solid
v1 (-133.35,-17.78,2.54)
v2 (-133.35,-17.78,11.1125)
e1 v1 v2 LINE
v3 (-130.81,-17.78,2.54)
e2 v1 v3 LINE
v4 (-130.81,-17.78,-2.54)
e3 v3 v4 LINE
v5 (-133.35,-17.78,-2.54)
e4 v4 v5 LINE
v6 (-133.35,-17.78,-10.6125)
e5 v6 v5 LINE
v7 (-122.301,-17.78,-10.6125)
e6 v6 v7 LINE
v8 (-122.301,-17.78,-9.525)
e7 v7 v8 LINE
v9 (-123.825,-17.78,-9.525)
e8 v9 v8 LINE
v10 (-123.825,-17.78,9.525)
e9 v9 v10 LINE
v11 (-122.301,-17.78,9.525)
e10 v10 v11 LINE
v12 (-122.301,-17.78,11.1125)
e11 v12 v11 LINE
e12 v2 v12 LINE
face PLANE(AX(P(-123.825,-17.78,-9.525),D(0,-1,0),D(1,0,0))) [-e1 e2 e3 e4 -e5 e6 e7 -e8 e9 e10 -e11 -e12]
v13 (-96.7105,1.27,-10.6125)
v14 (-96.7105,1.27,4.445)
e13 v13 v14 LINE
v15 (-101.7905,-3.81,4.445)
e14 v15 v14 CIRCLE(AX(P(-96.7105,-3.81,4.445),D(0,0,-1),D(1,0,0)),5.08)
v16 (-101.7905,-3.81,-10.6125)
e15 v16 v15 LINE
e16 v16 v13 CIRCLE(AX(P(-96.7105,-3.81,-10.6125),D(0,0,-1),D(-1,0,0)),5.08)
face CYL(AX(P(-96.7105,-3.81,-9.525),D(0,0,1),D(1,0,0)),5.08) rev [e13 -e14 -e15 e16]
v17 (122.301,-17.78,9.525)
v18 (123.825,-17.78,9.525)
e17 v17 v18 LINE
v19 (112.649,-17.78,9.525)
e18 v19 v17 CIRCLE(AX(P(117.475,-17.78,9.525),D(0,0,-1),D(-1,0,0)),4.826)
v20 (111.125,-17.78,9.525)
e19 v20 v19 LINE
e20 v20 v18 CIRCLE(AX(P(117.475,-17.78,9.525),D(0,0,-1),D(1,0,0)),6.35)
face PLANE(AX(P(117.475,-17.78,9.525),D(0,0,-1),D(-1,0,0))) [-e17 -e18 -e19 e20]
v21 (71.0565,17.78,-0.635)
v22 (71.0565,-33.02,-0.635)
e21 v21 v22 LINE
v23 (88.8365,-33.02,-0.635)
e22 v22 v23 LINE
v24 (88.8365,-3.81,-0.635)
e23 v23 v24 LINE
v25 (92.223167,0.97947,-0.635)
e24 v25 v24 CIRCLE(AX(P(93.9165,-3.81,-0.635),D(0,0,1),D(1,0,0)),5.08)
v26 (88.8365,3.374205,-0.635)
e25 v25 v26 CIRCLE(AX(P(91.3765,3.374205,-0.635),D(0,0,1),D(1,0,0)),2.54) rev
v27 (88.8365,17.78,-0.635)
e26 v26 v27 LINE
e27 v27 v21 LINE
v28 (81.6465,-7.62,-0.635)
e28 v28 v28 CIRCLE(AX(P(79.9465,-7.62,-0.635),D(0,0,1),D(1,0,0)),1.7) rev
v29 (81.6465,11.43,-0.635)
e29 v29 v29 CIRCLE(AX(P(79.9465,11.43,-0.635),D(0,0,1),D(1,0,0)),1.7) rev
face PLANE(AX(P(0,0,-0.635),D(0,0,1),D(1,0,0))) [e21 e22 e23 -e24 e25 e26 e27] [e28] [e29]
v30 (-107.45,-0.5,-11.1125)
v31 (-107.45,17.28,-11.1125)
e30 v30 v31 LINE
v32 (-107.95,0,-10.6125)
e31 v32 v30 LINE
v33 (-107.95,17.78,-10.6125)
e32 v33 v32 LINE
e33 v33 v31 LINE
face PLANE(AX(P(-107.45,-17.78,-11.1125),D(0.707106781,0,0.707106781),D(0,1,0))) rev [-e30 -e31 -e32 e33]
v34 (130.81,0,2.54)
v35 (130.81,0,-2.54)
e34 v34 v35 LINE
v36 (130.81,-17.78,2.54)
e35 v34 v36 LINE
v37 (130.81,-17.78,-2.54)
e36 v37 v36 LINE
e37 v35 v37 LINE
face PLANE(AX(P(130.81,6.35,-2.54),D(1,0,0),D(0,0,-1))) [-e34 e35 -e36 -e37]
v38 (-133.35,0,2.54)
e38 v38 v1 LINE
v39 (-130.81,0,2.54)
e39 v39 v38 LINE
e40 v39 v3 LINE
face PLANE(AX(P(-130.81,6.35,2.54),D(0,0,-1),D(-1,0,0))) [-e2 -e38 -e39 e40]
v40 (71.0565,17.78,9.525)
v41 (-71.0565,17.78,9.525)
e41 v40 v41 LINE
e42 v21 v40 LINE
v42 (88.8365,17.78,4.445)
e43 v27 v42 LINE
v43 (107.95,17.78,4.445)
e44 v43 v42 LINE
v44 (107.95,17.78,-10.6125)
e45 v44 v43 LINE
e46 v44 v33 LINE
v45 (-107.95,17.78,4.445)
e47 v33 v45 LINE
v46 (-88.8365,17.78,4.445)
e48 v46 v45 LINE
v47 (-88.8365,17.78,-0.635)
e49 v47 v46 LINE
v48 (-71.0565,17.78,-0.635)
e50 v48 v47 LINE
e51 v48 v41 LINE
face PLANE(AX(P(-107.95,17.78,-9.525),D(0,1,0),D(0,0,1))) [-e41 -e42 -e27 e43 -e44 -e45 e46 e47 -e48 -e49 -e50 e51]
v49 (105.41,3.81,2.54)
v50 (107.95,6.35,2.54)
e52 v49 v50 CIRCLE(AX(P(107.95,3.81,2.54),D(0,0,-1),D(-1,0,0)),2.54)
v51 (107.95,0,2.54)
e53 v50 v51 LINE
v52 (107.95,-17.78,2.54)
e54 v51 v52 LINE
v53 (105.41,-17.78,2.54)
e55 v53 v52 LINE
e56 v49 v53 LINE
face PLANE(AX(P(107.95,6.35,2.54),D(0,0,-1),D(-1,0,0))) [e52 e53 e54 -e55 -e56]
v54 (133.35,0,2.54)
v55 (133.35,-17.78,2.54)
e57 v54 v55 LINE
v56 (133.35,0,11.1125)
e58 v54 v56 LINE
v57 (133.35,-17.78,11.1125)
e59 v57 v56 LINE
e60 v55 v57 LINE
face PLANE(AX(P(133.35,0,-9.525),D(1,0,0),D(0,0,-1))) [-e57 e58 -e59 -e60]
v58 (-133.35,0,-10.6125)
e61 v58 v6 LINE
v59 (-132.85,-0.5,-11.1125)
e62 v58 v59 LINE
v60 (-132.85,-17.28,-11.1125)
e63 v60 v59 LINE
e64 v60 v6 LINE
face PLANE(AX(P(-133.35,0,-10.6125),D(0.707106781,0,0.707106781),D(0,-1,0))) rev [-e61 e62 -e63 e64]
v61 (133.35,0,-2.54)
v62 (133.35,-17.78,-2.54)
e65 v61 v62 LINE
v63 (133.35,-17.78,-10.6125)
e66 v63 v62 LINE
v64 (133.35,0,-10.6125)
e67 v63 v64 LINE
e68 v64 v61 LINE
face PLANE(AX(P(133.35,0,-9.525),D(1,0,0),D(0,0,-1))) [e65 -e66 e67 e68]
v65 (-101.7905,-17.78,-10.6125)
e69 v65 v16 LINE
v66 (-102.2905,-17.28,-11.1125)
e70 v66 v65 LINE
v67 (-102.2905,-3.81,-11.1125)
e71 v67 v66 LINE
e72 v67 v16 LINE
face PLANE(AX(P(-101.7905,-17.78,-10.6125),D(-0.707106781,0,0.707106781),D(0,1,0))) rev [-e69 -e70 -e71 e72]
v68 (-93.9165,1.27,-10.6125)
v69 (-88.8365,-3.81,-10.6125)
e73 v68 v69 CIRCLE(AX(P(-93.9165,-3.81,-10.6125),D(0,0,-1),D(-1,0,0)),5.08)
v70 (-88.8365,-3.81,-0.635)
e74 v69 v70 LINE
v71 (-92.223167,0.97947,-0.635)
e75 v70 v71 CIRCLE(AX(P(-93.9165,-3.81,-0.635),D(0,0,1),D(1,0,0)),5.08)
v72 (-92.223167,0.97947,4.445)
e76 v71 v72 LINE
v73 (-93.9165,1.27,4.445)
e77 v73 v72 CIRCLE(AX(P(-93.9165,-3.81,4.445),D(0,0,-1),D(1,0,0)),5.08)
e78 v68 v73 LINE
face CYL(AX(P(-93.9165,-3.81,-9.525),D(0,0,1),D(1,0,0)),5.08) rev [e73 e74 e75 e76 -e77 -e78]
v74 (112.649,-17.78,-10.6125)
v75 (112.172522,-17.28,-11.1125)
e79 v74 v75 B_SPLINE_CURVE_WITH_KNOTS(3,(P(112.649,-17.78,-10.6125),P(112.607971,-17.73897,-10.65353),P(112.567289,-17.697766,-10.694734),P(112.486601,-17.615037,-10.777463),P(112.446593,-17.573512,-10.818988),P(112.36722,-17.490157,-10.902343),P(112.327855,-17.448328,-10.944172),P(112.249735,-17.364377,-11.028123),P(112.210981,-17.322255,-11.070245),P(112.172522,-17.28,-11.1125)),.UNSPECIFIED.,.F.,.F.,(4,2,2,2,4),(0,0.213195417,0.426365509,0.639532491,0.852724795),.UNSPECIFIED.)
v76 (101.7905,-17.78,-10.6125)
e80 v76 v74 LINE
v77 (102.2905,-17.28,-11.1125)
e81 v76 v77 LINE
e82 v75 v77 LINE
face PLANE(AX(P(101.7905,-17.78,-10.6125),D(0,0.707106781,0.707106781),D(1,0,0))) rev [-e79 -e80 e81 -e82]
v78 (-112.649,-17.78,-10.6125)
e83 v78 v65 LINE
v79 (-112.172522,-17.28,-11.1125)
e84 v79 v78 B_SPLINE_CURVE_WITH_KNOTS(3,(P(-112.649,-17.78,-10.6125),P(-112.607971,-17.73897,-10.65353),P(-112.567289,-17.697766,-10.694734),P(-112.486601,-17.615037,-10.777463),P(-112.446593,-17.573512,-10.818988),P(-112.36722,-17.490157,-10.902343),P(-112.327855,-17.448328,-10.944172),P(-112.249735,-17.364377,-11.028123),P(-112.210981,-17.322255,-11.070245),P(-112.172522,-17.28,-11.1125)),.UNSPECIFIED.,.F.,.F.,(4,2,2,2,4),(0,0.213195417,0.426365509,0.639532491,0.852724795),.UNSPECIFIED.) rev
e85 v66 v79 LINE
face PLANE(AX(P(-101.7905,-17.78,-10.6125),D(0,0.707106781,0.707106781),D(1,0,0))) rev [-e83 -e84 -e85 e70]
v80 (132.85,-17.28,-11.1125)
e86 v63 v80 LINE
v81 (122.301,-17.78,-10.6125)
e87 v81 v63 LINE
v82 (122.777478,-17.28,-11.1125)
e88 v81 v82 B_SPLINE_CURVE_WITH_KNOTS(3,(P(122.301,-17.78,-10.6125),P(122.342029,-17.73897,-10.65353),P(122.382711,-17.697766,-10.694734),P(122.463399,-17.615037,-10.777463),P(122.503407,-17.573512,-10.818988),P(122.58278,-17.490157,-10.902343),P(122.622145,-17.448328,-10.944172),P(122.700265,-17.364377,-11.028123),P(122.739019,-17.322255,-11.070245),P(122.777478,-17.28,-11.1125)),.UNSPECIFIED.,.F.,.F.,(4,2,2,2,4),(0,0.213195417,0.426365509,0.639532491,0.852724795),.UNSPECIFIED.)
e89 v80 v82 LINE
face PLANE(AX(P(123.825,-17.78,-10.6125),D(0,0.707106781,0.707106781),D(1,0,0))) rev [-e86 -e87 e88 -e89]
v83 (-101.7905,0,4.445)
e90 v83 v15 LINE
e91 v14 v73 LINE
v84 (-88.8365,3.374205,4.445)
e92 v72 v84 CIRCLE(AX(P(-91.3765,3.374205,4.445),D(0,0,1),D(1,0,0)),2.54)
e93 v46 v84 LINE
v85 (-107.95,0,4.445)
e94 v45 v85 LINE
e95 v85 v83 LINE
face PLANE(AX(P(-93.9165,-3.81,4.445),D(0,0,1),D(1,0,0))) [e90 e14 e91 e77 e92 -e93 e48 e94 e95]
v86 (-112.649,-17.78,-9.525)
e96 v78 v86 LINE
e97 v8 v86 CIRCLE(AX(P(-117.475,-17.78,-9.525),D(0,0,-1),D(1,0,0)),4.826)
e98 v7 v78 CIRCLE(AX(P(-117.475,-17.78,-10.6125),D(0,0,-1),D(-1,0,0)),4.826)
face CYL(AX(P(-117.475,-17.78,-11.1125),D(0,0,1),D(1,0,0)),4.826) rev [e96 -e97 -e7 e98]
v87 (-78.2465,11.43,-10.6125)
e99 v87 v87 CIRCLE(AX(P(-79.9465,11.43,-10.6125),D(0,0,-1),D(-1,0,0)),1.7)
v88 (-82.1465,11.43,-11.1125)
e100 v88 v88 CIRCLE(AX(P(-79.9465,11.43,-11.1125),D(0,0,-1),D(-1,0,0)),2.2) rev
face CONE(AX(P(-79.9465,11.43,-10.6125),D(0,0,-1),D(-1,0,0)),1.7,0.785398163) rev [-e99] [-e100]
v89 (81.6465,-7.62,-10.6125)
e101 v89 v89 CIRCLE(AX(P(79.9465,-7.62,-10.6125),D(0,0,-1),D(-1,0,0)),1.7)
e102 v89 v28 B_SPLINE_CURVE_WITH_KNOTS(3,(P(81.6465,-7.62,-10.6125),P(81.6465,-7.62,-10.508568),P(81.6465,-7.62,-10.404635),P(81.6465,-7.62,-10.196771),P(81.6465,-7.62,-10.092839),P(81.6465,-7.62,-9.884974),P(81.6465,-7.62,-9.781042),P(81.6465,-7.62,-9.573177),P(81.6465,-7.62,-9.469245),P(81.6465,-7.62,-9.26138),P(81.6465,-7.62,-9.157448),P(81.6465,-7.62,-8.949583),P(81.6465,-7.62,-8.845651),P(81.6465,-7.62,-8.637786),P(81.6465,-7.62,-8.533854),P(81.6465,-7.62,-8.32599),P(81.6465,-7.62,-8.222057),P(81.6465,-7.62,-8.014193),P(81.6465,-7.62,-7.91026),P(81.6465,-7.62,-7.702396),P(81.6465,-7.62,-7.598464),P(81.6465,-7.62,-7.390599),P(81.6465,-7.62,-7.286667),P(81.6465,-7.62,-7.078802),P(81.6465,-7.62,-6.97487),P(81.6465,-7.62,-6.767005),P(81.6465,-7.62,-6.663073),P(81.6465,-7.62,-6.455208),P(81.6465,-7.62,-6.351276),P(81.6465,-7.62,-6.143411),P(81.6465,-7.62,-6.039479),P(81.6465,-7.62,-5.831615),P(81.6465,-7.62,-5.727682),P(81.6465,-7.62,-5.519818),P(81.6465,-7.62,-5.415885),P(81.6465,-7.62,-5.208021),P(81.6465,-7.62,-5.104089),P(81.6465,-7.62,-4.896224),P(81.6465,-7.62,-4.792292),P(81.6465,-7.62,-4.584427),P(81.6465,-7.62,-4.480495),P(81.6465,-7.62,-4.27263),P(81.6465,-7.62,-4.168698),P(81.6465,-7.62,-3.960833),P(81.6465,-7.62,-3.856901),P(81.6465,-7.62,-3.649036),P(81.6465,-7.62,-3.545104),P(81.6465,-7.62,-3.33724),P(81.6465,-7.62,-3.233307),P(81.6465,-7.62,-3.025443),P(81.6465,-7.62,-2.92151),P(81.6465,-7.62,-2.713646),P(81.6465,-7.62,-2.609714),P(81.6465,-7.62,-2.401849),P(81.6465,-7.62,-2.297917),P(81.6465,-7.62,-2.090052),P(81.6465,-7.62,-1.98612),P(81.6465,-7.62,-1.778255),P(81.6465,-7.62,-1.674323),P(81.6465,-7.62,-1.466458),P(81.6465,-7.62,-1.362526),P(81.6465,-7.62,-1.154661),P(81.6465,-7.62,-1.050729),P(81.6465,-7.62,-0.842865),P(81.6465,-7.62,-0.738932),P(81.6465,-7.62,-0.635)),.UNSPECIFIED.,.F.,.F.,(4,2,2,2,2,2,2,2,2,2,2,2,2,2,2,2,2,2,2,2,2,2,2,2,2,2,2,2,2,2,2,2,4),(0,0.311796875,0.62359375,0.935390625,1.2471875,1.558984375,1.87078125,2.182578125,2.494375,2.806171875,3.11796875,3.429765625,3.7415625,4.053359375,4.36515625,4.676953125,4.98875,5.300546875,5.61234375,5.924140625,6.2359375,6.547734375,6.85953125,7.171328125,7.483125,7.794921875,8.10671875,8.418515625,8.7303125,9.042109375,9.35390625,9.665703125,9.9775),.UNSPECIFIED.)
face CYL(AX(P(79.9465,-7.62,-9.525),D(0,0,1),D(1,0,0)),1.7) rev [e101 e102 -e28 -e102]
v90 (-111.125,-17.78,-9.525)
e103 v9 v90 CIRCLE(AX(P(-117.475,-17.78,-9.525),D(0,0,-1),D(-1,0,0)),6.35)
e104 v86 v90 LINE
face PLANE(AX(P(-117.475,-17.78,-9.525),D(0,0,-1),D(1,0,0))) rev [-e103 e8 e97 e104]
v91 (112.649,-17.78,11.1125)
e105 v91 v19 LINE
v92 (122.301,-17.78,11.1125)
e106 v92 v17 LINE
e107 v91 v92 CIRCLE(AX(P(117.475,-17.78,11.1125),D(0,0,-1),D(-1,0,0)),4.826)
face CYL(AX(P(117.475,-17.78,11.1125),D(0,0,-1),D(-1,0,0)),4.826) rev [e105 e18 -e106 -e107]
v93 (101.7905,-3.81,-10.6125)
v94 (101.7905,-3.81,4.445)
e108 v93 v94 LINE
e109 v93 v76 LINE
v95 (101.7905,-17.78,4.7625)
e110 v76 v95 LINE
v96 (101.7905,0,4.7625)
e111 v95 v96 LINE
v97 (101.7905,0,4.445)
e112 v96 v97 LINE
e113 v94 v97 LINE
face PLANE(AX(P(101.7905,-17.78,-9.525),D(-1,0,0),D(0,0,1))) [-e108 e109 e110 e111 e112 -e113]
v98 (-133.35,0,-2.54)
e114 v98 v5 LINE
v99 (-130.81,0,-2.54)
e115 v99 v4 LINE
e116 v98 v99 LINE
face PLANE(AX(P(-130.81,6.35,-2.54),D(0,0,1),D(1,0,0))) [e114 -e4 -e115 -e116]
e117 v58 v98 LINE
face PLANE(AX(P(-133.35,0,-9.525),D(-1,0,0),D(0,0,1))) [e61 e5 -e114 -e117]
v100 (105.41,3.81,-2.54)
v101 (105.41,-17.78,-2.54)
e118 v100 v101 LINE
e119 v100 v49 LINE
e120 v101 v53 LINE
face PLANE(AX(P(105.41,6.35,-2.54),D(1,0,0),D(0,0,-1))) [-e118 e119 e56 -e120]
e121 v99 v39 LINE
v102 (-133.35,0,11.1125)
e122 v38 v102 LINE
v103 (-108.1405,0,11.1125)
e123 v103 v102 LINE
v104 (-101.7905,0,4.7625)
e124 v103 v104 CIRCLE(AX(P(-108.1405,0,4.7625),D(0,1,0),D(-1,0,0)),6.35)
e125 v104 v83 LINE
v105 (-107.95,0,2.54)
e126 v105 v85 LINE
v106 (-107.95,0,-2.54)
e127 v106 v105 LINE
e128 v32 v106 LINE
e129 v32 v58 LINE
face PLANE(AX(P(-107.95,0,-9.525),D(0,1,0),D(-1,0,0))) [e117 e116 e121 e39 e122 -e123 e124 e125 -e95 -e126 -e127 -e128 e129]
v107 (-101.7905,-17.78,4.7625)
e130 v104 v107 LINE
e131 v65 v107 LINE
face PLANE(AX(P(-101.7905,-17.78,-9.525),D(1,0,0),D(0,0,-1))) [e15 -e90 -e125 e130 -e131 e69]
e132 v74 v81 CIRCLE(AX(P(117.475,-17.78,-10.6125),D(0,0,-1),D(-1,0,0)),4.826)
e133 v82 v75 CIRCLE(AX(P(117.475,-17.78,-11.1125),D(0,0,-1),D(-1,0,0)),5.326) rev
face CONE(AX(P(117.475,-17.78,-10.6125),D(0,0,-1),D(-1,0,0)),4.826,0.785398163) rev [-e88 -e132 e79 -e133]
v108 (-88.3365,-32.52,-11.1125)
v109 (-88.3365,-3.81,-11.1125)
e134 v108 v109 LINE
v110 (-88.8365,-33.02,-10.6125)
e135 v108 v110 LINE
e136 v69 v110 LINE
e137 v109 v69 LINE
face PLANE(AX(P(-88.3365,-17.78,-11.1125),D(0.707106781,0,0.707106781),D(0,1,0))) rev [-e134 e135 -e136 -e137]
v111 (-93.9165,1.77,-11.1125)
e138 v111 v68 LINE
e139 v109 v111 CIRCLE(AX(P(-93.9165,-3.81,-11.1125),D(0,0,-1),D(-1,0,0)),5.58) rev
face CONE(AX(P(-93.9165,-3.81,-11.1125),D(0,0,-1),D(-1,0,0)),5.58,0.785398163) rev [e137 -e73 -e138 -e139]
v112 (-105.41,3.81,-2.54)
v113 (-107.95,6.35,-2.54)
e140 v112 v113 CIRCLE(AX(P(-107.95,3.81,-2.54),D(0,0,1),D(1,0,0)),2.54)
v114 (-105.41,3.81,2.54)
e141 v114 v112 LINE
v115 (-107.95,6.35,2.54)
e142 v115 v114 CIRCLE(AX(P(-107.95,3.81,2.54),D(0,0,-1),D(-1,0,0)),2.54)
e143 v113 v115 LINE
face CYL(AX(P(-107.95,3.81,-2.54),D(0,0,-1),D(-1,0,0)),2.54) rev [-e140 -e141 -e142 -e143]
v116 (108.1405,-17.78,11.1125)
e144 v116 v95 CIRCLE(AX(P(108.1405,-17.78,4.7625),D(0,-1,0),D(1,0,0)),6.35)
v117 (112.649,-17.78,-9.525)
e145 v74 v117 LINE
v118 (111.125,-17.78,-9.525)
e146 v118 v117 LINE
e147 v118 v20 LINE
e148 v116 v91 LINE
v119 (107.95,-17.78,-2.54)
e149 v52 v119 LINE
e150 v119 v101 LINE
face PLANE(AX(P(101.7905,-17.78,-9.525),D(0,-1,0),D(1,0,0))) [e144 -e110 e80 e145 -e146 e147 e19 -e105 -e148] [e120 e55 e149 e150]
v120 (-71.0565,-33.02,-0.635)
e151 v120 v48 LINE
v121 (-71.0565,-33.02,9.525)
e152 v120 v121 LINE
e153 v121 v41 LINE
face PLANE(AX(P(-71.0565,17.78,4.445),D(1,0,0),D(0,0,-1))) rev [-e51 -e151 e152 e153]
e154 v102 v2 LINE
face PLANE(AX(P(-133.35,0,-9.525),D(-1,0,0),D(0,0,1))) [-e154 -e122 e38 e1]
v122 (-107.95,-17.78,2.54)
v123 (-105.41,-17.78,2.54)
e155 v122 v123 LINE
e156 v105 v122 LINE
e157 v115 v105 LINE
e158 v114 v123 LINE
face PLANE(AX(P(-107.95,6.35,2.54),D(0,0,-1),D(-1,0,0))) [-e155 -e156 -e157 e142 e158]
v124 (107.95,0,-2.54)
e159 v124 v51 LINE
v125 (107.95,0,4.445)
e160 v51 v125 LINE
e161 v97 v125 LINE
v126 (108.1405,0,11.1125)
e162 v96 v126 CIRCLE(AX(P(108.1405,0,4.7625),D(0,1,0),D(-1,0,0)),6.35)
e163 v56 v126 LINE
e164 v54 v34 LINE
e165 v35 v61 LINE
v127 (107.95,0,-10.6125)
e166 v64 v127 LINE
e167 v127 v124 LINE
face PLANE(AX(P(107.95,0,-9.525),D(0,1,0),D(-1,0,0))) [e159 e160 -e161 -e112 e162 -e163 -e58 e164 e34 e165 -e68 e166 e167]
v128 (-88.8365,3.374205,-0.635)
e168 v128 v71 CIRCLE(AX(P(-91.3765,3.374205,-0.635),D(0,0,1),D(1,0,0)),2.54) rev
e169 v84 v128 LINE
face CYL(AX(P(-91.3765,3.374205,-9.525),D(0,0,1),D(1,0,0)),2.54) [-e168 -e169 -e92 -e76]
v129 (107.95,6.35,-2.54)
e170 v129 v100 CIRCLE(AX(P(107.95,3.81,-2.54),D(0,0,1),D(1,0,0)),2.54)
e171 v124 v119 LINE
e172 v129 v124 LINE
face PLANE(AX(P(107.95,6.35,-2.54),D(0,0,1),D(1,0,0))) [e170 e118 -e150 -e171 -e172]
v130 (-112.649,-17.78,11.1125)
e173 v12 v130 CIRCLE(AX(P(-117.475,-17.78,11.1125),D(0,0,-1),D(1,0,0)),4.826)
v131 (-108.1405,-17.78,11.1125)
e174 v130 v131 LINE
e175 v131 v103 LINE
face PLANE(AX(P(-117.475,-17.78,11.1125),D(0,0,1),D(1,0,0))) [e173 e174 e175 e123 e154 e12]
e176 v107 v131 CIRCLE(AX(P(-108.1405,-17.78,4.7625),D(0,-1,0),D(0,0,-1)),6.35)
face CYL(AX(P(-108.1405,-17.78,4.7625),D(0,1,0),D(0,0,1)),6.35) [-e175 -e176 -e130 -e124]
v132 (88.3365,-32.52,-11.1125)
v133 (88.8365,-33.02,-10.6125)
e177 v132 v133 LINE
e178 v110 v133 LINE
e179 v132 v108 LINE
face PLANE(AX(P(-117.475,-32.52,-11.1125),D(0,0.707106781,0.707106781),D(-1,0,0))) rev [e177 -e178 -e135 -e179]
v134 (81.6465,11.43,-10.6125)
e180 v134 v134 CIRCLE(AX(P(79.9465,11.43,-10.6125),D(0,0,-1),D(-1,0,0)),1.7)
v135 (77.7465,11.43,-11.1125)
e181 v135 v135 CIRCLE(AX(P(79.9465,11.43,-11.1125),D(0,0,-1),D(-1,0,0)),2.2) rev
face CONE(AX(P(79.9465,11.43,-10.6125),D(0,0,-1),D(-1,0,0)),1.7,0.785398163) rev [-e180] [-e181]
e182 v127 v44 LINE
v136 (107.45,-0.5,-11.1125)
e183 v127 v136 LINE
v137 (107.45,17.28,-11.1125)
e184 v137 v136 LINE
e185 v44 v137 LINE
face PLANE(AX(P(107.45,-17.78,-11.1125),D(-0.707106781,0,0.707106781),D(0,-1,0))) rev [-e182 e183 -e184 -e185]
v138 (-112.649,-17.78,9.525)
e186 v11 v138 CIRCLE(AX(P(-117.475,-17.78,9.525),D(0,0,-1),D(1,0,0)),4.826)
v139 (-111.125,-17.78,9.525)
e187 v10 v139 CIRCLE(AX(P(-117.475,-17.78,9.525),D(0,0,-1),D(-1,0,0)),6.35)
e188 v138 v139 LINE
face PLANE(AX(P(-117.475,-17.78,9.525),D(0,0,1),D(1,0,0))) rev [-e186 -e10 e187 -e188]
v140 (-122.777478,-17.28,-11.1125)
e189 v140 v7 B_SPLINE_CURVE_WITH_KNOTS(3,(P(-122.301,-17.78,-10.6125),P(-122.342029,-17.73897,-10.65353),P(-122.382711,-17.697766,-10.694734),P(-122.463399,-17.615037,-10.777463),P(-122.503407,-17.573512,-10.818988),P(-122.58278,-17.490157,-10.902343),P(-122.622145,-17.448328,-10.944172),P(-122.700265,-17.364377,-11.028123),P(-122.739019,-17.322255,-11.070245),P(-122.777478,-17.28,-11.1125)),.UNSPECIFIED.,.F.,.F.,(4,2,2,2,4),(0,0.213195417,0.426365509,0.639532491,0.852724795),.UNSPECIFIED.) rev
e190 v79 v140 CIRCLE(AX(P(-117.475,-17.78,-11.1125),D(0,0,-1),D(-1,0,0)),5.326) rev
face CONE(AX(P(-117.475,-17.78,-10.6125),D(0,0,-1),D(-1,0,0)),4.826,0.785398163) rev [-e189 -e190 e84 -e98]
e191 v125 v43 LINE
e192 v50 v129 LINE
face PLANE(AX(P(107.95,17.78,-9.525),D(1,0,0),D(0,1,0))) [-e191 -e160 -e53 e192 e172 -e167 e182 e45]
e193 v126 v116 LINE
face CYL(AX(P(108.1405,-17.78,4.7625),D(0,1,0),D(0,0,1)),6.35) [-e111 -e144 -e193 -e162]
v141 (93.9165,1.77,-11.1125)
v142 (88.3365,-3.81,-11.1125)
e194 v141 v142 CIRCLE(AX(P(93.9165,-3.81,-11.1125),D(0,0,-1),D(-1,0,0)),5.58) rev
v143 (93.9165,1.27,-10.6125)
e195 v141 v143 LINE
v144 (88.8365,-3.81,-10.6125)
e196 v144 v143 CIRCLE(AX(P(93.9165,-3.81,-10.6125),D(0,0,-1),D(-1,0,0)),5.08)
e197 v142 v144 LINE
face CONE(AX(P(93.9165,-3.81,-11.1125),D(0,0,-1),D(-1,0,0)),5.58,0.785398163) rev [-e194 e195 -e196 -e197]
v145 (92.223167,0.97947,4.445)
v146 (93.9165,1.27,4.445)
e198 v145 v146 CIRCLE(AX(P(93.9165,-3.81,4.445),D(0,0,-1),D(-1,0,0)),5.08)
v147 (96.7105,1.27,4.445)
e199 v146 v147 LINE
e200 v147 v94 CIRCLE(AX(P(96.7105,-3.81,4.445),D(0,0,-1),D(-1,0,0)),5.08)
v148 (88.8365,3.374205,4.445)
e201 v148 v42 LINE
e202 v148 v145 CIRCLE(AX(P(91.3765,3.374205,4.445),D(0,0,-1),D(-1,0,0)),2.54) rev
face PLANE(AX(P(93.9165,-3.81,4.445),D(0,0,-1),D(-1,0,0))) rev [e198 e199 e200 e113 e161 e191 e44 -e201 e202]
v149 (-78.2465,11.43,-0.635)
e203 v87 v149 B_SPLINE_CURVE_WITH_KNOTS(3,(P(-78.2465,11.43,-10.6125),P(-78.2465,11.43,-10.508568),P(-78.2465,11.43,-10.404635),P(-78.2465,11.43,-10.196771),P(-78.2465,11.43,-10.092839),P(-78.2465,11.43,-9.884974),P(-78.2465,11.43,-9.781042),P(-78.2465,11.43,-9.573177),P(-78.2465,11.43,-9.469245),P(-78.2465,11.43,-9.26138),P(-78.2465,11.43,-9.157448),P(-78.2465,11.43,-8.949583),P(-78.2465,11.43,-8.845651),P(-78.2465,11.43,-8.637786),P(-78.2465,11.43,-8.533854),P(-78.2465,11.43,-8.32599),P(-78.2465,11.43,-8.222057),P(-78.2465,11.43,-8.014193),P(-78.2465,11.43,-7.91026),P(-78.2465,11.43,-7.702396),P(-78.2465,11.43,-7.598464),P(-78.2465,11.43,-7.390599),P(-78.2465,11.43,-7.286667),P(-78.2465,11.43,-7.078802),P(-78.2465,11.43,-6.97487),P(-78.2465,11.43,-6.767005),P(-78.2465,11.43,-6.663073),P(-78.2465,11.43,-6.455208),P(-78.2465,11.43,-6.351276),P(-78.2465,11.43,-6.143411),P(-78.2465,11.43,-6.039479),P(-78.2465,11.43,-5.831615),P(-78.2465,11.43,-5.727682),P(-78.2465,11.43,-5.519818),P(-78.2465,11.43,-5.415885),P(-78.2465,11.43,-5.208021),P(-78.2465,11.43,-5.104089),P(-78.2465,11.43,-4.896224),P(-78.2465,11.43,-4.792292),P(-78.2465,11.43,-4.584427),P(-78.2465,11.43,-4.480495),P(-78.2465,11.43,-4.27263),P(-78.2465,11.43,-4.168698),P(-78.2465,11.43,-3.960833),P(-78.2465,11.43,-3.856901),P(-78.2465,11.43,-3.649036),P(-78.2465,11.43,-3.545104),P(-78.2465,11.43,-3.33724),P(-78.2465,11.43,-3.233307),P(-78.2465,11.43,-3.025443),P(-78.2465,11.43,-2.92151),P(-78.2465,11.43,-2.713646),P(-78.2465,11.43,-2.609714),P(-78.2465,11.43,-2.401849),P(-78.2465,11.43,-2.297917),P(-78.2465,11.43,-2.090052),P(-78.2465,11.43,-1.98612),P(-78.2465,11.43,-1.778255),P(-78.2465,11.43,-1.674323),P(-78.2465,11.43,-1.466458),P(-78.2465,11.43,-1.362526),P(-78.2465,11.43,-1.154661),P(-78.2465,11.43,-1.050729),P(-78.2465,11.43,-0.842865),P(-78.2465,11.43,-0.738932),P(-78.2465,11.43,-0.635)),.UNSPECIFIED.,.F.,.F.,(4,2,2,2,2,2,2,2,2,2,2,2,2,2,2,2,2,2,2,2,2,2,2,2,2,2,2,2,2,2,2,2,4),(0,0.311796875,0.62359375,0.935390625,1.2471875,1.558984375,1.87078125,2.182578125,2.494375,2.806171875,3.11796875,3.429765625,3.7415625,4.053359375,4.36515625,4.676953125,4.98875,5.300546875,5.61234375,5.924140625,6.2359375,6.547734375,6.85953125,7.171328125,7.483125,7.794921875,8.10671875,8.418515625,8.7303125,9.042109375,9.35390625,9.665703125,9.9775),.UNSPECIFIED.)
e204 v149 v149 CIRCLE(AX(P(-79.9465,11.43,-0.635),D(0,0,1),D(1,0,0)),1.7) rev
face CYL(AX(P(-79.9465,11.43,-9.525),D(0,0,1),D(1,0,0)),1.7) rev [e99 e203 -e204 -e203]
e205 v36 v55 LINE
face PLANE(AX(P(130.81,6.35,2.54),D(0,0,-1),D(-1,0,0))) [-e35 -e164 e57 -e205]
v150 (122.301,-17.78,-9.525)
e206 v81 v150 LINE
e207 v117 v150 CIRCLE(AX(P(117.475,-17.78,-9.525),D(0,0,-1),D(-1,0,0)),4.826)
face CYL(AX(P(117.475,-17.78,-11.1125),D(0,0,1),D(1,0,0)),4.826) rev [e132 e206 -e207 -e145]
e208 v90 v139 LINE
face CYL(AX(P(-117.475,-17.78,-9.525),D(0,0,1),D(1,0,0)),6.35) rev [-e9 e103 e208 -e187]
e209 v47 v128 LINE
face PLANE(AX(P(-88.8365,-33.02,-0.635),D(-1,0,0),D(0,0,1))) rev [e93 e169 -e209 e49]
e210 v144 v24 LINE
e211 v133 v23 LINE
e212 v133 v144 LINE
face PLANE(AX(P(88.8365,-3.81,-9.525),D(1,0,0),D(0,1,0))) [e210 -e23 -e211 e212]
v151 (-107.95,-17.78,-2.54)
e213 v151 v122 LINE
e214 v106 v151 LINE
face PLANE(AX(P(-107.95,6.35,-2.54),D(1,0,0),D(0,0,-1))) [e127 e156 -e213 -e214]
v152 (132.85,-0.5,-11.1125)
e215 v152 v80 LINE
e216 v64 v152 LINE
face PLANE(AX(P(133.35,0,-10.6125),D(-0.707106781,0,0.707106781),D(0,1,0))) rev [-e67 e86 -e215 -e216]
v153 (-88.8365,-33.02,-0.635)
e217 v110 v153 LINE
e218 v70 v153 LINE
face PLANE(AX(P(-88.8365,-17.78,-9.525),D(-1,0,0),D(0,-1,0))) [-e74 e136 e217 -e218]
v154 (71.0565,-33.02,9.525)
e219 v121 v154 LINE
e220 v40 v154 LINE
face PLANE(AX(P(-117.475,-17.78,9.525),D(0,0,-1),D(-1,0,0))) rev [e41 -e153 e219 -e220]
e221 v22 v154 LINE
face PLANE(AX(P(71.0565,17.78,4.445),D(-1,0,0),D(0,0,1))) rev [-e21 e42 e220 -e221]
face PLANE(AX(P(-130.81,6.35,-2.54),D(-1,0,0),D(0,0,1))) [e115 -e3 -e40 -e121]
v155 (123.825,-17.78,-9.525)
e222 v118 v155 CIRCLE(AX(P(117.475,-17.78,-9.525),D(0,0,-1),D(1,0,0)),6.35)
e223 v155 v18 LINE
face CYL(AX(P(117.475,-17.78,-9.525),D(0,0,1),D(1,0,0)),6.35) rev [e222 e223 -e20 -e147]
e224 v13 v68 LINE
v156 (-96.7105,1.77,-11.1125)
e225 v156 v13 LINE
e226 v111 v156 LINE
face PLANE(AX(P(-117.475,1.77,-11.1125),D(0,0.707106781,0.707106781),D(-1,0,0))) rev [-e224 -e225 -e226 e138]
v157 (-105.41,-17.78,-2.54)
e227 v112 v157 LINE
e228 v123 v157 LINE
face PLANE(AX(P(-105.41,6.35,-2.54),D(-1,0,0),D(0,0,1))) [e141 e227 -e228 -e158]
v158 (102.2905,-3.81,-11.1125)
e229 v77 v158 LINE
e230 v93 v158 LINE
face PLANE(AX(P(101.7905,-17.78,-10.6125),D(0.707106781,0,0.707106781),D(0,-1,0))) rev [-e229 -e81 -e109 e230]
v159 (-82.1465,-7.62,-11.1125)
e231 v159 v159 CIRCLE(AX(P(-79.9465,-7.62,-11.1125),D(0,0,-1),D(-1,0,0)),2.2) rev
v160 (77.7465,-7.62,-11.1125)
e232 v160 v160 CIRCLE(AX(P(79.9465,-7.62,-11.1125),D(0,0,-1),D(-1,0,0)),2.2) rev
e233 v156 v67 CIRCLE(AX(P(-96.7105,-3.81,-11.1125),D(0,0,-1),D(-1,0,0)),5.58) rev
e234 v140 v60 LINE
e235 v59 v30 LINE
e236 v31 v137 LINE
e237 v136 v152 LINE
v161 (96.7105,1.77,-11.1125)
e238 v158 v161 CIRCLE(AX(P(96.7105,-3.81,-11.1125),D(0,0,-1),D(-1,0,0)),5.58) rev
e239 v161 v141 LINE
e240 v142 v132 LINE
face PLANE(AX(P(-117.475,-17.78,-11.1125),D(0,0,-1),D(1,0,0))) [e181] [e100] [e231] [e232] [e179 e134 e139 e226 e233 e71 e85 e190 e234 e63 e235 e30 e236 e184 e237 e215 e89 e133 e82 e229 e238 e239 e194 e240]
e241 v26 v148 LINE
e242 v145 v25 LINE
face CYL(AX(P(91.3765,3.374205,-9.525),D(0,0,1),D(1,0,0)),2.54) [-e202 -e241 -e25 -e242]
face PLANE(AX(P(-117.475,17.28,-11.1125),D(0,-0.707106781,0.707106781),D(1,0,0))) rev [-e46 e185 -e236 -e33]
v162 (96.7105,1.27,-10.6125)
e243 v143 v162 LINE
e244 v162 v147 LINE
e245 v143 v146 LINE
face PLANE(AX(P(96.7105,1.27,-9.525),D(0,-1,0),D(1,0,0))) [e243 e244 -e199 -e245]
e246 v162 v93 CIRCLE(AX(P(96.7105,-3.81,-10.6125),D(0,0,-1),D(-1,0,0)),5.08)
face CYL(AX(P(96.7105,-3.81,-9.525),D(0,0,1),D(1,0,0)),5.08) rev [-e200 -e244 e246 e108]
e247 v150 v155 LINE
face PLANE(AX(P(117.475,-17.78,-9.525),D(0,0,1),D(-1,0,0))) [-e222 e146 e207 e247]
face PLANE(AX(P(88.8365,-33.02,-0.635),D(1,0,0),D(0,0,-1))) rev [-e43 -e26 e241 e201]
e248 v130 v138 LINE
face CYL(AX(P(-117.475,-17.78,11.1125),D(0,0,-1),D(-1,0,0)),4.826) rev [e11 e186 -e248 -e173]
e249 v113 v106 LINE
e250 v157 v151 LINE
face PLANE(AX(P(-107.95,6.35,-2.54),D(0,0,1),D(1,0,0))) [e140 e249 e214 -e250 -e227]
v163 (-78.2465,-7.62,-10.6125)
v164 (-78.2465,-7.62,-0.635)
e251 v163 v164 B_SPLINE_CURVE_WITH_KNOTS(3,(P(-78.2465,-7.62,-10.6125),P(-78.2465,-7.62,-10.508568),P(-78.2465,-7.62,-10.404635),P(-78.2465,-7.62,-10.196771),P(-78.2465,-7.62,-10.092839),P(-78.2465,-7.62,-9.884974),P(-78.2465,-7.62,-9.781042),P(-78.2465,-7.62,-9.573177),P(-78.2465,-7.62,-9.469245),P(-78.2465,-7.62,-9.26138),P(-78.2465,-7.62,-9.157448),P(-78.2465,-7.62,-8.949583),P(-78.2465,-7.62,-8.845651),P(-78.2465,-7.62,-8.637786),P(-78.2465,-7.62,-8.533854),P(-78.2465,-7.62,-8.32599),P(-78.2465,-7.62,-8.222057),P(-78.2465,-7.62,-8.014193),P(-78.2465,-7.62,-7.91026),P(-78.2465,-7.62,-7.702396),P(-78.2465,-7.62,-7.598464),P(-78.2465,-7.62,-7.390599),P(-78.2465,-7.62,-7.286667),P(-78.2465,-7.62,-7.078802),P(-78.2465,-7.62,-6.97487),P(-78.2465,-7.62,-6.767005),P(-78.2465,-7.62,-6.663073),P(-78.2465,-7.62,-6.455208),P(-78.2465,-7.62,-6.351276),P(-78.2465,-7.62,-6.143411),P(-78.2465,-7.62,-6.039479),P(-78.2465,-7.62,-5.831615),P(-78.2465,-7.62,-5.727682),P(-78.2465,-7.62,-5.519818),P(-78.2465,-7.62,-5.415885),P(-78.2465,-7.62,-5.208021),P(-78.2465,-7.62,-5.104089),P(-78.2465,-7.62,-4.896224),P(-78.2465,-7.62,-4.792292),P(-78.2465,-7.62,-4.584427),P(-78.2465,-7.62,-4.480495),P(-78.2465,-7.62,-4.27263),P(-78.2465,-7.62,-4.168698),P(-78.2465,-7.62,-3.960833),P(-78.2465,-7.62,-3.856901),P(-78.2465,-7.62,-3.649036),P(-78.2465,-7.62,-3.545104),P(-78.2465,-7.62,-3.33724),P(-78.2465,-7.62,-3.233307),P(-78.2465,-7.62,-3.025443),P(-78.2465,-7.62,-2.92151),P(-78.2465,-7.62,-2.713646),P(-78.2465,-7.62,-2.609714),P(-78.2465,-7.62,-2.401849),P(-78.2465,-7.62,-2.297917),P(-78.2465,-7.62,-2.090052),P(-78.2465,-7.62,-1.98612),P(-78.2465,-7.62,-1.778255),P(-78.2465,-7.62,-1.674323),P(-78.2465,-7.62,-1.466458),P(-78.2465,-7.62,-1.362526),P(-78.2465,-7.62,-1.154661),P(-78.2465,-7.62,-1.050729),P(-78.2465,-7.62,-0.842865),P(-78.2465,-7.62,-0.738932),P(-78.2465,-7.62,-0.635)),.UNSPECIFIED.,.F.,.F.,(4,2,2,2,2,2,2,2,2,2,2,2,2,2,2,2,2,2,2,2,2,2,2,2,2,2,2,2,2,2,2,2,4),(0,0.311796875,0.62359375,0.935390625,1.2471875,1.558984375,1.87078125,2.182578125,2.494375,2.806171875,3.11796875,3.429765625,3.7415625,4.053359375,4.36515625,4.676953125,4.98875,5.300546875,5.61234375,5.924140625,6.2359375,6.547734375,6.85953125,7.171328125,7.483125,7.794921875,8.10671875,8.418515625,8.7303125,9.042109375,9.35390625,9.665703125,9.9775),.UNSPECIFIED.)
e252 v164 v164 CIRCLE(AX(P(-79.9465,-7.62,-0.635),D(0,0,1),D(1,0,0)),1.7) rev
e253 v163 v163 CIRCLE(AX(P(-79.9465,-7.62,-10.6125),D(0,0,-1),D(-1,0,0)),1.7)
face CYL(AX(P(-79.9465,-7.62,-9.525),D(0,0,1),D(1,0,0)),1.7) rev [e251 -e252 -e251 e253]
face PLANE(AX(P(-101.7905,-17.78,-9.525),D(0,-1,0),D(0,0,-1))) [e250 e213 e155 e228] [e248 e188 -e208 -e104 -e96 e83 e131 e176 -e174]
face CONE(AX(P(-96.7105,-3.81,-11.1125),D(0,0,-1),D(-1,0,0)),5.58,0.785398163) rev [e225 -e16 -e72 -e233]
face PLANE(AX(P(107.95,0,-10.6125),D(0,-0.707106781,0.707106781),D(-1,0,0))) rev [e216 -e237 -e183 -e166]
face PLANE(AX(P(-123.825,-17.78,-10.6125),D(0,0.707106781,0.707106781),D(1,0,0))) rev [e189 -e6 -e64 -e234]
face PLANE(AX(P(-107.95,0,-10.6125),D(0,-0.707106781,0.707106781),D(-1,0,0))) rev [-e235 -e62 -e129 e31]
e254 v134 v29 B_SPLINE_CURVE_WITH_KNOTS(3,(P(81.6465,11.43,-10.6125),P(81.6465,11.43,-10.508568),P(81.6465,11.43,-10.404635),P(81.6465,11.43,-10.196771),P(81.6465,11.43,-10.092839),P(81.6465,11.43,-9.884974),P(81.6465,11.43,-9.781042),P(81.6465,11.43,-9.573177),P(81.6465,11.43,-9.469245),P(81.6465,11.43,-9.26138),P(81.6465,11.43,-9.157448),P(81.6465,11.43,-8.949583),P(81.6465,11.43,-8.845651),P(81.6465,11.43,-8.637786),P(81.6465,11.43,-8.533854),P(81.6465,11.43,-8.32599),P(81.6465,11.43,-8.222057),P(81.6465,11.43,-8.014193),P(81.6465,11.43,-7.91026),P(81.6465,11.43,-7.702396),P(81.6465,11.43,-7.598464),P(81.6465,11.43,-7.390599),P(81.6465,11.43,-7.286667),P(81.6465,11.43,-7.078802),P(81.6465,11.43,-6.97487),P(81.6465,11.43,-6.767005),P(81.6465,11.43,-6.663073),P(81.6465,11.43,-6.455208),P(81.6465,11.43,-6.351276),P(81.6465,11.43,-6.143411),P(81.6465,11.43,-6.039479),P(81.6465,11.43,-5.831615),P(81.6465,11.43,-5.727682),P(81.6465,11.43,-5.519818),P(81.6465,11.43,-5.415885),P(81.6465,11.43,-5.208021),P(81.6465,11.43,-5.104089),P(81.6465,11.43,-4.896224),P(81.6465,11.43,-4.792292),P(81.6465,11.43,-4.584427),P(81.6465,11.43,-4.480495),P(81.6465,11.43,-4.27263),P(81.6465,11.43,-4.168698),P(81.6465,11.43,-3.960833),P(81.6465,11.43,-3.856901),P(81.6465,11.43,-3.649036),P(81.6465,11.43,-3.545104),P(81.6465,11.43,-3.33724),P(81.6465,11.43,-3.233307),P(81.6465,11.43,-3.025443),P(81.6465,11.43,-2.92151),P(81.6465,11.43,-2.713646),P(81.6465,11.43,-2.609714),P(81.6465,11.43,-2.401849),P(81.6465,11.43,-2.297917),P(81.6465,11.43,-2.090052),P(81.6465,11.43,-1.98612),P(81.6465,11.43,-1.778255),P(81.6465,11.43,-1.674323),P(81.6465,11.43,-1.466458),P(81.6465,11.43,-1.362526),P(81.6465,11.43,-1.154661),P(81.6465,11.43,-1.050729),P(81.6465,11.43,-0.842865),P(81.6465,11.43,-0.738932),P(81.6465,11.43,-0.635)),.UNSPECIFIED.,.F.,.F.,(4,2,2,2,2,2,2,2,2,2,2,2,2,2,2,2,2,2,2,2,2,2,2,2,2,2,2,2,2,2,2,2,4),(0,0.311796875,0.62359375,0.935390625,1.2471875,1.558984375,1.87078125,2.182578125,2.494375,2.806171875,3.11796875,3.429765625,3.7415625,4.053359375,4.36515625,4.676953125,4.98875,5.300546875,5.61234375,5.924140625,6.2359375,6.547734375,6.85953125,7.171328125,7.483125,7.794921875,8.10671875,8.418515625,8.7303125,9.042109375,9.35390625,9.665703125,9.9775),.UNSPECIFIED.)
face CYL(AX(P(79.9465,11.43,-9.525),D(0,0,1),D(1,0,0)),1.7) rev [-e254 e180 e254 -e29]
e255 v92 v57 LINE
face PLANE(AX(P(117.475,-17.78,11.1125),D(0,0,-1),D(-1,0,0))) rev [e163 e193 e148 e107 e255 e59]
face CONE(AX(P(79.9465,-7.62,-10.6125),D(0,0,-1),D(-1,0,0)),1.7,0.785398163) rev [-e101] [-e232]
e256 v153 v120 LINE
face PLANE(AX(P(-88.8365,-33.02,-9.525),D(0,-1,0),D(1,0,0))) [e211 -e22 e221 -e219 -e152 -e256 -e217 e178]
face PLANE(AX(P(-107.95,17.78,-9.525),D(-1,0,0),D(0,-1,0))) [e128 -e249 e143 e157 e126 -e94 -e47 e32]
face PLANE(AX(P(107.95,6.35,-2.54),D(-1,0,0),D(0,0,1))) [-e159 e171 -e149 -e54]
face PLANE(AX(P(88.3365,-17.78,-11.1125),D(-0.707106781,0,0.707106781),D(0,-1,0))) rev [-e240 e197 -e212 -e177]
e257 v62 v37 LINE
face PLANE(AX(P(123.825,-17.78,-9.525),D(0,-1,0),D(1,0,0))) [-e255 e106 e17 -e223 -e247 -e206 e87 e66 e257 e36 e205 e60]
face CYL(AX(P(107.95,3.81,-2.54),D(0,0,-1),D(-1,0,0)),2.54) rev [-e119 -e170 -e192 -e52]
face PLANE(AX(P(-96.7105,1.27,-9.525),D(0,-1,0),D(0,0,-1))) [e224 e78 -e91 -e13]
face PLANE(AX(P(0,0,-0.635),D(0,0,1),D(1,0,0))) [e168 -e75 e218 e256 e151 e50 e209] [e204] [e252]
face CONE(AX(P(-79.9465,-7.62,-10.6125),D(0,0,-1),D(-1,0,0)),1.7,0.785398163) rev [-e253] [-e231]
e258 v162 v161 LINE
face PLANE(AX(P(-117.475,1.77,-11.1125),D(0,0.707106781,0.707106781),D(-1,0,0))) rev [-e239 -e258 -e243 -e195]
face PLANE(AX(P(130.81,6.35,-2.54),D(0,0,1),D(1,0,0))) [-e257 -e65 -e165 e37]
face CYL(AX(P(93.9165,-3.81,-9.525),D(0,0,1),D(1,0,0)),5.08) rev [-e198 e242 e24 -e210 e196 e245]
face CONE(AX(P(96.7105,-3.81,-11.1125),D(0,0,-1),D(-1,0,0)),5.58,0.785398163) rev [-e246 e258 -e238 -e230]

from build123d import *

# Parameters (mm, degrees)
BOSS_EXTRUDE1_DEPTH      = 9.525
BOSS_EXTRUDE1_DEPTH_BACK = 9.525
SKETCH1_R                = 1.7
CUT_EXTRUDE1_DEPTH       = 6.35
CUT_EXTRUDE1_DEPTH_BACK  = 27.686
SKETCH2_W                = 2.54
SKETCH2_H                = 5.08
BOSS_EXTRUDE2_DEPTH      = 1.5875
BOSS_EXTRUDE3_START      = 1.5875
SKETCH5_R                = 1.7
BOSS_EXTRUDE3_DEPTH      = 1.5875
CUT_EXTRUDE2_START       = -5.08
CUT_EXTRUDE2_DEPTH       = 5.08
FILLET1_R                = 6.35
FILLET2_R                = 2.54
CHAMFER1_SIZE            = 0.5
SKETCH8_W                = 17.78
SKETCH8_H                = 50.8
CUT_EXTRUDE3_DEPTH       = 5.08
FILLET3_START            = -0.635
FILLET3_DEPTH            = 5.635


with BuildPart() as part:
    # Sketch1 → Boss-Extrude1 (new, two sides: drawn at the far end of the back side and taken through both)
    with BuildSketch(Plane.XY.offset(-BOSS_EXTRUDE1_DEPTH_BACK)):
        with BuildLine():
            Line((-107.95, 0), (-133.35, 0))
            Line((-133.35, 0), (-133.35, -17.78))
            Line((-133.35, -17.78), (-123.825, -17.78))
            ThreePointArc((-123.825, -17.78), (-117.475, -11.43), (-111.125, -17.78))
            Line((-111.125, -17.78), (-101.7905, -17.78))
            Line((-101.7905, -17.78), (-101.7905, -3.81))
            ThreePointArc((-101.7905, -3.81), (-100.302602448, -0.217897552), (-96.7105, 1.27))
            Line((-96.7105, 1.27), (-93.9165, 1.27))
            ThreePointArc((-93.9165, 1.27), (-90.324397552, -0.217897552), (-88.8365, -3.81))
            Line((-88.8365, -3.81), (-88.8365, -17.78))
            Line((-88.8365, -17.78), (-88.8365, -33.02))
            Line((-88.8365, -33.02), (88.8365, -33.02))
            Line((88.8365, -33.02), (88.8365, -17.78))
            Line((88.8365, -17.78), (88.8365, -3.81))
            ThreePointArc((88.8365, -3.81), (90.324397552, -0.217897552), (93.9165, 1.27))
            Line((93.9165, 1.27), (96.7105, 1.27))
            ThreePointArc((96.7105, 1.27), (100.302602448, -0.217897552), (101.7905, -3.81))
            Line((101.7905, -3.81), (101.7905, -17.78))
            Line((101.7905, -17.78), (111.125, -17.78))
            ThreePointArc((111.125, -17.78), (117.475, -11.43), (123.825, -17.78))
            Line((123.825, -17.78), (133.35, -17.78))
            Line((133.35, -17.78), (133.35, 0))
            Line((133.35, 0), (107.95, 0))
            Line((107.95, 0), (107.95, 17.78))
            Line((107.95, 17.78), (-107.95, 17.78))
            Line((-107.95, 17.78), (-107.95, 0))
        make_face()
        with Locations((-79.9465, -7.62)):
            Circle(SKETCH1_R, mode=Mode.SUBTRACT)
        with Locations((-79.9465, 11.43)):
            Circle(SKETCH1_R, mode=Mode.SUBTRACT)
        with Locations((79.9465, -7.62)):
            Circle(SKETCH1_R, mode=Mode.SUBTRACT)
        with Locations((79.9465, 11.43)):
            Circle(SKETCH1_R, mode=Mode.SUBTRACT)
    extrude(amount=BOSS_EXTRUDE1_DEPTH + BOSS_EXTRUDE1_DEPTH_BACK)

    # Sketch2 → Cut-Extrude1 (cut, two sides: drawn at the far end of the back side and taken through both)
    with BuildSketch(Plane(origin=(0, 0, 0), x_dir=(1, 0, 0), z_dir=(0, 1, 0)).offset(-CUT_EXTRUDE1_DEPTH_BACK)):
        with Locations((-106.68, 0)):
            Rectangle(SKETCH2_W, SKETCH2_H)
        with Locations((-132.08, 0)):
            Rectangle(SKETCH2_W, SKETCH2_H)
        with Locations((132.08, 0)):
            Rectangle(SKETCH2_W, SKETCH2_H)
        with Locations((106.68, 0)):
            Rectangle(SKETCH2_W, SKETCH2_H)
    extrude(amount=CUT_EXTRUDE1_DEPTH + CUT_EXTRUDE1_DEPTH_BACK, mode=Mode.SUBTRACT)

    # Sketch3 → Boss-Extrude2 (add)
    with BuildSketch(Plane.XY.offset(9.525)):
        with BuildLine():
            Line((-101.7905, -17.78), (-101.7905, 0))
            Line((-101.7905, 0), (-133.35, 0))
            Line((-133.35, 0), (-133.35, -17.78))
            Line((-133.35, -17.78), (-122.301, -17.78))
            ThreePointArc((-122.301, -17.78), (-117.475, -12.954), (-112.649, -17.78))
            Line((-112.649, -17.78), (-101.7905, -17.78))
        make_face()
        with BuildLine():
            Line((101.7905, -17.78), (112.649, -17.78))
            ThreePointArc((112.649, -17.78), (117.475, -12.954), (122.301, -17.78))
            Line((122.301, -17.78), (133.35, -17.78))
            Line((133.35, -17.78), (133.35, 0))
            Line((133.35, 0), (101.7905, 0))
            Line((101.7905, 0), (101.7905, -17.78))
        make_face()
    boss_extrude2 = extrude(amount=BOSS_EXTRUDE2_DEPTH)

    # Mirror1: Boss-Extrude2 across plane
    add(boss_extrude2.mirror(Plane.XY))

    # Sketch5 → Boss-Extrude3 (add)
    with BuildSketch(Plane(origin=(0, 0, -9.525), x_dir=(-1, 0, 0), z_dir=(0, 0, -1)).offset(BOSS_EXTRUDE3_START)):
        with BuildLine():
            Line((-107.95, 0), (-101.7905, 0))
            Line((-101.7905, 0), (-101.7905, -3.81))
            ThreePointArc((-101.7905, -3.81), (-100.302602448, -0.217897552), (-96.7105, 1.27))
            Line((-96.7105, 1.27), (-93.9165, 1.27))
            ThreePointArc((-93.9165, 1.27), (-90.324397552, -0.217897552), (-88.8365, -3.81))
            Line((-88.8365, -3.81), (-88.8365, -33.02))
            Line((-88.8365, -33.02), (88.8365, -33.02))
            Line((88.8365, -33.02), (88.8365, -3.81))
            ThreePointArc((88.8365, -3.81), (90.324397552, -0.217897552), (93.9165, 1.27))
            Line((93.9165, 1.27), (96.7105, 1.27))
            ThreePointArc((96.7105, 1.27), (100.302602448, -0.217897552), (101.7905, -3.81))
            Line((101.7905, -3.81), (101.7905, 0))
            Line((101.7905, 0), (107.95, 0))
            Line((107.95, 0), (107.95, 17.78))
            Line((107.95, 17.78), (-107.95, 17.78))
            Line((-107.95, 17.78), (-107.95, 0))
        make_face()
        with Locations(Location((-79.9465, -7.62, 0), (0, 0, 180))):
            Circle(SKETCH5_R, mode=Mode.SUBTRACT)
        with Locations(Location((-79.9465, 11.43, 0), (0, 0, 180))):
            Circle(SKETCH5_R, mode=Mode.SUBTRACT)
        with Locations(Location((79.9465, -7.62, 0), (0, 0, 180))):
            Circle(SKETCH5_R, mode=Mode.SUBTRACT)
        with Locations(Location((79.9465, 11.43, 0), (0, 0, 180))):
            Circle(SKETCH5_R, mode=Mode.SUBTRACT)
    extrude(amount=-BOSS_EXTRUDE3_DEPTH)

    # Sketch7 → Cut-Extrude2 (cut)
    with BuildSketch(Plane.XY.offset(9.525).offset(CUT_EXTRUDE2_START)):
        with BuildLine():
            Line((-88.8365, -33.02), (-88.8365, -3.81))
            ThreePointArc((-88.8365, -3.81), (-90.324397552, -0.217897552), (-93.9165, 1.27))
            Line((-93.9165, 1.27), (-96.7105, 1.27))
            ThreePointArc((-96.7105, 1.27), (-100.302602448, -0.217897552), (-101.7905, -3.81))
            Line((-101.7905, -3.81), (-101.7905, 0))
            Line((-101.7905, 0), (-107.95, 0))
            Line((-107.95, 0), (-107.95, 17.78))
            Line((-107.95, 17.78), (-71.0565, 17.78))
            Line((-71.0565, 17.78), (-71.0565, -33.02))
            Line((-71.0565, -33.02), (-88.8365, -33.02))
        make_face()
        with BuildLine():
            Line((71.0565, -33.02), (88.8365, -33.02))
            Line((88.8365, -33.02), (88.8365, -3.81))
            ThreePointArc((88.8365, -3.81), (90.324397552, -0.217897552), (93.9165, 1.27))
            Line((93.9165, 1.27), (96.7105, 1.27))
            ThreePointArc((96.7105, 1.27), (100.302602448, -0.217897552), (101.7905, -3.81))
            Line((101.7905, -3.81), (101.7905, 0))
            Line((101.7905, 0), (107.95, 0))
            Line((107.95, 0), (107.95, 17.78))
            Line((107.95, 17.78), (71.0565, 17.78))
            Line((71.0565, 17.78), (71.0565, -33.02))
        make_face()
    extrude(amount=CUT_EXTRUDE2_DEPTH, mode=Mode.SUBTRACT)

    # Fillet1
    fillet1_edges = [part.edges().sort_by_distance(p)[0] for p in [
        (-101.7905, -8.89, 11.1125),
        (101.7905, -8.89, 11.1125),
    ]]
    fillet(fillet1_edges, radius=FILLET1_R)

    # Fillet2
    fillet2_edges = [part.edges().sort_by_distance(p)[0] for p in [
        (105.41, 6.35, 0),
        (-105.41, 6.35, 0),
    ]]
    fillet(fillet2_edges, radius=FILLET2_R - 0.0001)  # a hair under: the kernel refuses the full size

    # Chamfer1
    chamfer1_edges = [part.edges().sort_by_distance(p)[0] for p in [
        (-107.21975, -17.78, -11.1125),
        (-117.475, -12.954, -11.1125),
        (-127.8255, -17.78, -11.1125),
        (-133.35, -8.89, -11.1125),
        (-101.7905, -10.795, -11.1125),
        (117.475, -12.954, -11.1125),
        (107.21975, -17.78, -11.1125),
        (120.65, 0, -11.1125),
        (133.35, -8.89, -11.1125),
        (127.8255, -17.78, -11.1125),
        (101.7905, -10.795, -11.1125),
        (-120.65, 0, -11.1125),
        (-81.6465, -7.62, -11.1125),
        (78.2465, 11.43, -11.1125),
        (78.2465, -7.62, -11.1125),
        (-81.6465, 11.43, -11.1125),
        (0, 17.78, -11.1125),
        (107.95, 8.89, -11.1125),
        (100.302602448, -0.217897552, -11.1125),
        (95.3135, 1.27, -11.1125),
        (90.324397552, -0.217897552, -11.1125),
        (88.8365, -18.415, -11.1125),
        (0, -33.02, -11.1125),
        (-88.8365, -18.415, -11.1125),
        (-90.324397552, -0.217897552, -11.1125),
        (-95.3135, 1.27, -11.1125),
        (-100.302602448, -0.217897552, -11.1125),
        (-107.95, 8.89, -11.1125),
    ]]
    chamfer(chamfer1_edges, length=CHAMFER1_SIZE)

    # Sketch8 → Cut-Extrude3 (cut)
    with BuildSketch(Plane.XY.offset(4.445)):
        with Locations((-79.9465, -7.62)):
            Rectangle(SKETCH8_W, SKETCH8_H)
        with Locations((79.9465, -7.62)):
            Rectangle(SKETCH8_W, SKETCH8_H)
    extrude(amount=-CUT_EXTRUDE3_DEPTH, mode=Mode.SUBTRACT)

    # Fillet3: read off the stored shape, not the designer's step
    # Fillet3 outline → Fillet3 (cut)
    with BuildSketch(Plane.XY.offset(FILLET3_START)):
        with BuildLine():
            ThreePointArc((92.223166667, 0.979469931), (89.910030316, 1.300303581), (88.8365, 3.374204897))
            Line((88.8365, 3.374204897), (88.8365, -3.81))
            ThreePointArc((88.8365, -3.81), (89.768697369, -0.877060633), (92.223166667, 0.979469931))
        make_face()
        with BuildLine():
            ThreePointArc((-88.8365, 3.374204897), (-89.910030316, 1.300303581), (-92.223166667, 0.979469931))
            ThreePointArc((-92.223166667, 0.979469931), (-89.768697369, -0.877060633), (-88.8365, -3.81))
            Line((-88.8365, -3.81), (-88.8365, 3.374204897))
        make_face()
    extrude(amount=FILLET3_DEPTH, mode=Mode.SUBTRACT)


solid = part.part
